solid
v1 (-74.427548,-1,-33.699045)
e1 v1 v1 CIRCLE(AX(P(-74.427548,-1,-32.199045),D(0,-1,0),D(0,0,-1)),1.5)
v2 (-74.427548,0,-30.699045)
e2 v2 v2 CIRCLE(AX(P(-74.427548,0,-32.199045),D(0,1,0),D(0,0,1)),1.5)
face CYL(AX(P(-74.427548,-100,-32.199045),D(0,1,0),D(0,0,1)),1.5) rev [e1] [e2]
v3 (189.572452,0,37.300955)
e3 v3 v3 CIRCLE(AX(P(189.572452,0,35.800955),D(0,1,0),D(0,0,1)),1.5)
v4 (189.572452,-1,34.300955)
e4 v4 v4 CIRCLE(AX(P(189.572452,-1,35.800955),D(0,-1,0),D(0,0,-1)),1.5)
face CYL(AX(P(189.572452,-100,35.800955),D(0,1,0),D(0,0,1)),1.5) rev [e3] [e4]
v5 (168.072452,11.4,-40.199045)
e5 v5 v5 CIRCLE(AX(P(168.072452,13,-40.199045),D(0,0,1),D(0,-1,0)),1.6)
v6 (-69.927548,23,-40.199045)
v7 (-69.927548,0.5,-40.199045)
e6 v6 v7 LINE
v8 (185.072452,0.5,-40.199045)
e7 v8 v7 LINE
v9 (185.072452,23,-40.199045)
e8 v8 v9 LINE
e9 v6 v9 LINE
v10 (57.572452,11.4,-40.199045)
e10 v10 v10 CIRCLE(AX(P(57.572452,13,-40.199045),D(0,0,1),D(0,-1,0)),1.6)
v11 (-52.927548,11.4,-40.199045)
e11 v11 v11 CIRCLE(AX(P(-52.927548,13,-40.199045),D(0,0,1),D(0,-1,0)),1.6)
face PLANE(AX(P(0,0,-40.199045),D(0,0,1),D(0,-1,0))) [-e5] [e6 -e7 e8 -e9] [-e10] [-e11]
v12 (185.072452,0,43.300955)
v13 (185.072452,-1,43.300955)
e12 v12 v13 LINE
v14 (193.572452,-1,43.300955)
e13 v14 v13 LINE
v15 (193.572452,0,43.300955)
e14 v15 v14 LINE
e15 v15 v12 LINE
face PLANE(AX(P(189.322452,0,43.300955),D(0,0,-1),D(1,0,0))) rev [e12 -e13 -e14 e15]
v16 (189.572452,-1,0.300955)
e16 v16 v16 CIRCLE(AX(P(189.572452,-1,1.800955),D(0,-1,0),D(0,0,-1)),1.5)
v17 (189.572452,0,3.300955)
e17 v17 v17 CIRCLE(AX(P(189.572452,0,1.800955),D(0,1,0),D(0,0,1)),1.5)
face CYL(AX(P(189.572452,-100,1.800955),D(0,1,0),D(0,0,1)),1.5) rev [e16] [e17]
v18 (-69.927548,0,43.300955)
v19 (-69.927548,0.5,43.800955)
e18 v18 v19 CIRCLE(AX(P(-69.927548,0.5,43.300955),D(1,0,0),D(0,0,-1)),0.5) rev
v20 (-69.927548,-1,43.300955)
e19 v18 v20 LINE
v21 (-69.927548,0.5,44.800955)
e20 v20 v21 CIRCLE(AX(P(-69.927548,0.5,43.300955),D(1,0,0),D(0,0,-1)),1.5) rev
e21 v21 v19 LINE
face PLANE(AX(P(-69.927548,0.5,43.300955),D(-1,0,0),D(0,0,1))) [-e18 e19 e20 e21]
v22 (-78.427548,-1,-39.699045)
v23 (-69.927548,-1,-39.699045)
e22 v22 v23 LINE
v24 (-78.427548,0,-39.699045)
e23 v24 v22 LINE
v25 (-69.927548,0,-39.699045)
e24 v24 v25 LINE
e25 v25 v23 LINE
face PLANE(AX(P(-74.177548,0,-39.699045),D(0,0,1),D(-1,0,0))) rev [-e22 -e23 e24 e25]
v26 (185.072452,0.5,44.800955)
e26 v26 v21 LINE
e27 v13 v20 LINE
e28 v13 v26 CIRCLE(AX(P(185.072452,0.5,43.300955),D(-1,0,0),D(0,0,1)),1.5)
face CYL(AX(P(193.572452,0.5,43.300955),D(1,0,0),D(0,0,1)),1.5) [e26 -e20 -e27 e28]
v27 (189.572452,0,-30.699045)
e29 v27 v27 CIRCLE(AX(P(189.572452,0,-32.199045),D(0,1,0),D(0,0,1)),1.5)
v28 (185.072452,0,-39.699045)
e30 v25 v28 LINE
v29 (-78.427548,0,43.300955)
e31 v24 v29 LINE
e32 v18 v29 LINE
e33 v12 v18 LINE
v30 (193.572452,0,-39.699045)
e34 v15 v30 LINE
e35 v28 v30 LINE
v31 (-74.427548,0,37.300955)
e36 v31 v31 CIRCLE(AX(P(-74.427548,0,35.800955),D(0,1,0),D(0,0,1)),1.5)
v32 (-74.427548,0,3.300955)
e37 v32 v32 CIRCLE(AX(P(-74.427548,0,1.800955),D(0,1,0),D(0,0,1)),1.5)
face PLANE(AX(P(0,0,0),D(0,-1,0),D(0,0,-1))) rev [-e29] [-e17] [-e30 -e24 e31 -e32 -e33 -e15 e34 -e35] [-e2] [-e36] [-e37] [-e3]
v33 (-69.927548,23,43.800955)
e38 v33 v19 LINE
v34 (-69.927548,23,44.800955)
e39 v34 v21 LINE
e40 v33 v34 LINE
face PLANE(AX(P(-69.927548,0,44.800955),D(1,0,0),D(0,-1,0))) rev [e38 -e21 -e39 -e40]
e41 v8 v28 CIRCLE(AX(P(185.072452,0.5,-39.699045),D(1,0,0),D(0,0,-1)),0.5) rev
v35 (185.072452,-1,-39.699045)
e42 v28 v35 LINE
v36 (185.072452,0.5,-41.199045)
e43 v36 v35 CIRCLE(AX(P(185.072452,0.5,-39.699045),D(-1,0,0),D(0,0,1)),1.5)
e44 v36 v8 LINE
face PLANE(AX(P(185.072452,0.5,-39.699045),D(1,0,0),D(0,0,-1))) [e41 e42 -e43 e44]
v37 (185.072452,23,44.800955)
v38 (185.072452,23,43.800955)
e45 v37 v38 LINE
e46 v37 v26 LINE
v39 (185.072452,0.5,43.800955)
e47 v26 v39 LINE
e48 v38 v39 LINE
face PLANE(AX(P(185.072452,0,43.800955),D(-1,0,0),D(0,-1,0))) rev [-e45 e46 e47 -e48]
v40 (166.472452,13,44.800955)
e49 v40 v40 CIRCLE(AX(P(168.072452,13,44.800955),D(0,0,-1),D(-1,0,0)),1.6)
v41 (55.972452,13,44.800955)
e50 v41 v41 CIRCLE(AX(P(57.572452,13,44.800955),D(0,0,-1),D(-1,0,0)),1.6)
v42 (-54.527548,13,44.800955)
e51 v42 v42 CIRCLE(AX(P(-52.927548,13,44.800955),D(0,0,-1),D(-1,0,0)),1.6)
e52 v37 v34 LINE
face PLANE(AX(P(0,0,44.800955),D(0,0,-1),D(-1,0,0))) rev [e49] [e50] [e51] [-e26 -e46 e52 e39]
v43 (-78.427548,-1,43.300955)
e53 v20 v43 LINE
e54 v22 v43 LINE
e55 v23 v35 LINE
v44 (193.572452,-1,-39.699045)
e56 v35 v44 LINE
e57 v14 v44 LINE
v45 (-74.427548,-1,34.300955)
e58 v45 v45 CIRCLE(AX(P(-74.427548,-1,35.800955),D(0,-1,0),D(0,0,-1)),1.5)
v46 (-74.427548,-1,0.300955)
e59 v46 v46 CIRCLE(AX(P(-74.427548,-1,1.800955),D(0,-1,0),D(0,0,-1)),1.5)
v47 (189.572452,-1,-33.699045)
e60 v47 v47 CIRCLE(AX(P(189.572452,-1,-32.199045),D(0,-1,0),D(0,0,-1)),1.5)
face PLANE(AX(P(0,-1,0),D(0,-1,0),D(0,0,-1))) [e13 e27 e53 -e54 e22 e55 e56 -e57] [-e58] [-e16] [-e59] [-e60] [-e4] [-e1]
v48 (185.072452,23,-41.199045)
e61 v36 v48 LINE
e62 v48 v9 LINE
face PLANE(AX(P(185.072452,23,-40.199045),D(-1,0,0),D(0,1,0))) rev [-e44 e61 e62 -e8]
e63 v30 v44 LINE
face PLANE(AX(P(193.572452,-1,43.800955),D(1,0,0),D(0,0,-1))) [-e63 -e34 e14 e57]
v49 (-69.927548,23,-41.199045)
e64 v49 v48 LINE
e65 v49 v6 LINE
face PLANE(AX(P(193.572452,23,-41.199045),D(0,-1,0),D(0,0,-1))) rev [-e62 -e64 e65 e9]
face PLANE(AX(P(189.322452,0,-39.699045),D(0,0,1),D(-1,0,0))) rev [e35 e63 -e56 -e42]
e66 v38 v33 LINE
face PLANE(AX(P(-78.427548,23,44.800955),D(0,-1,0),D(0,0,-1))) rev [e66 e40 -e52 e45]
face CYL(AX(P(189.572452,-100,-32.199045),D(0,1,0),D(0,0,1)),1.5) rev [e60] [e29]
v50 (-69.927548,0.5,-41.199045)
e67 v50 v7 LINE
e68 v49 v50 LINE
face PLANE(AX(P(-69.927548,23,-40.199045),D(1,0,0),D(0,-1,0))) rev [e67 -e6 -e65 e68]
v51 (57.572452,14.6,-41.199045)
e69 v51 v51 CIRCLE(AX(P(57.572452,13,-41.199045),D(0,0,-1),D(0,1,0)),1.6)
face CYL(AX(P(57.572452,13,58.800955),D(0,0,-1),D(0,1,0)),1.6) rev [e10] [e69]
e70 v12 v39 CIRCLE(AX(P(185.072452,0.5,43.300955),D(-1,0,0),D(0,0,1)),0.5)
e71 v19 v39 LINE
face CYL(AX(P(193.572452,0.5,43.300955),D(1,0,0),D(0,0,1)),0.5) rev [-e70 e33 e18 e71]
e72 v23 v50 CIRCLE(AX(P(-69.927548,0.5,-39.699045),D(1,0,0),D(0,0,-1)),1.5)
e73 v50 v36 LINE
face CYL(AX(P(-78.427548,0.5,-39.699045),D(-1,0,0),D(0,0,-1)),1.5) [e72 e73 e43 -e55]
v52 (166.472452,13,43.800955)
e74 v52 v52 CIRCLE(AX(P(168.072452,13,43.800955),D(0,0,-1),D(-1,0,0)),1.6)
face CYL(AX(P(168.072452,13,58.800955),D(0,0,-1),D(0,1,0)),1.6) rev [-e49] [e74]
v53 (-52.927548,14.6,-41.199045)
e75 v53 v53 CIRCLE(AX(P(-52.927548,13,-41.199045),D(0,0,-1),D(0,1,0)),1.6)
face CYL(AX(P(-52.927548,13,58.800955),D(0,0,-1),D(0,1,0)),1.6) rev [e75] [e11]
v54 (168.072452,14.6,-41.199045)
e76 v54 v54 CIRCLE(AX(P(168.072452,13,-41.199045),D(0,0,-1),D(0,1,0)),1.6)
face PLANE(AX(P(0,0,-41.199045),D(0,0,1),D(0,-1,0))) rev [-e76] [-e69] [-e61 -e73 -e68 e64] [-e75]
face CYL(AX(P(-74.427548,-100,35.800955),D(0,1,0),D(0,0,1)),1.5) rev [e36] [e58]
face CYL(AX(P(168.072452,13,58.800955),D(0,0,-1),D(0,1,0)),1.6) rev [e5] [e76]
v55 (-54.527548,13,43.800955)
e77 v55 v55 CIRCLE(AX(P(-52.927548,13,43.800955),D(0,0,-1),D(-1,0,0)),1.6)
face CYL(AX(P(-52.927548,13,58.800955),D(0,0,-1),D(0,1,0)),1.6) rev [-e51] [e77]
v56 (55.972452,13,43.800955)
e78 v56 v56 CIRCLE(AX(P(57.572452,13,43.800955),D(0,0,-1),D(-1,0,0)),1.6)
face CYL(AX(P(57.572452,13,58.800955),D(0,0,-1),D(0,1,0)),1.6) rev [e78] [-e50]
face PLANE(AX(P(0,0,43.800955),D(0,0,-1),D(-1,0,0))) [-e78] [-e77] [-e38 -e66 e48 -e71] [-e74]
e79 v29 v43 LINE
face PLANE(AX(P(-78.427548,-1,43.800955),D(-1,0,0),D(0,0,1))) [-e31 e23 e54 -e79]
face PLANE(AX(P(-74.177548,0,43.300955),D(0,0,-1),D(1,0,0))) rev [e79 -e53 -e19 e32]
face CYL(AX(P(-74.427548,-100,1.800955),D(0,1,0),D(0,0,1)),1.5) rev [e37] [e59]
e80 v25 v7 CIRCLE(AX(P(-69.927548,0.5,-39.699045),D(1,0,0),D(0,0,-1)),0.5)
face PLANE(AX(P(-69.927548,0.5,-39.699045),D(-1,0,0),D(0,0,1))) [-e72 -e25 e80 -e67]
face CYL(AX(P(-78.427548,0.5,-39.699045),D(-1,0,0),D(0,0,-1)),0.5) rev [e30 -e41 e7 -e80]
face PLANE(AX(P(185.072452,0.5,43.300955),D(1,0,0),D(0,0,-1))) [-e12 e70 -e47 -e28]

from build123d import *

# Parameters (mm, degrees)
SKETCH1_W                      = 272
SKETCH1_H                      = 84
BASE_FLANGE1_DEPTH             = 1
EDGE_FLANGE1_STRIP_W           = 5
EDGE_FLANGE1_STRIP_H           = 1
EDGE_FLANGE1_STRIP_CUT_DEPTH   = 272
EDGE_FLANGE1_STRIP_2_W         = 5
EDGE_FLANGE1_STRIP_2_H         = 1
EDGE_FLANGE1_STRIP_CUT_2_DEPTH = 272
EDGE_FLANGE1_DEPTH             = 272
EDGE_FLANGE1_BEND_DEPTH        = 272
CUT_EXTRUDE1_START             = -78.427547771
CUT_EXTRUDE1_DEPTH             = 8.5
CUT_EXTRUDE1_START_2           = 185.072452229
CUT_EXTRUDE1_2_DEPTH           = 8.5
SKETCH13_R                     = 1.6
CUT_EXTRUDE2_DEPTH             = 100
SKETCH14_R                     = 1.5
CUT_EXTRUDE3_DEPTH             = 100


# Read off the part's stored shape, not the designer's step: Cut-Extrude1
# Sheet-metal steps are written as plain solids
with BuildPart() as part:
    # Sketch1 → Base-Flange1 (new body)
    with BuildSketch(Plane(origin=(0, 0, 0), x_dir=(1, 0, 0), z_dir=(0, 1, 0))):
        with Locations((57.572452229, -1.800955414)):
            Rectangle(SKETCH1_W, SKETCH1_H)
    extrude(amount=-BASE_FLANGE1_DEPTH)

    # Edge-Flange1 strip (across the edge) → Edge-Flange1 strip cut (cut)
    with BuildSketch(Plane(origin=(-78.427547771, 0, 43.800955414), x_dir=(0, 0, -1), z_dir=(1, 0, 0))):
        with Locations((-2, -0.5)):
            Rectangle(EDGE_FLANGE1_STRIP_W, EDGE_FLANGE1_STRIP_H)
    extrude(amount=EDGE_FLANGE1_STRIP_CUT_DEPTH, mode=Mode.SUBTRACT)

    # Edge-Flange1 strip 2 (across the edge) → Edge-Flange1 strip cut 2 (cut)
    with BuildSketch(Plane(origin=(193.572452229, 0, -40.199044586), x_dir=(0, 0, 1), z_dir=(-1, 0, 0))):
        with Locations((-2, -0.5)):
            Rectangle(EDGE_FLANGE1_STRIP_2_W, EDGE_FLANGE1_STRIP_2_H)
    extrude(amount=EDGE_FLANGE1_STRIP_CUT_2_DEPTH, mode=Mode.SUBTRACT)

    # Edge-Flange1 section (across the edge) → Edge-Flange1 (add)
    with BuildSketch(Plane(origin=(-78.427547771, 0, 43.800955414), x_dir=(0, 0, -1), z_dir=(1, 0, 0))):
        with BuildLine():
            Line((-1, 0.5), (-1, 23))
            Line((-1, 23), (0, 23))
            Line((0, 23), (0, 0.5))
            ThreePointArc((0, 0.5), (0.146446609, 0.146446609), (0.5, 0))
            Line((0.5, 0), (0.5, -1))
            ThreePointArc((0.5, -1), (-0.560660172, -0.560660172), (-1, 0.5))
        make_face()
    extrude(amount=EDGE_FLANGE1_DEPTH)

    # Edge-Flange1 section 2 (across the edge) → Edge-Flange1 bend (add)
    with BuildSketch(Plane(origin=(193.572452229, 0, -40.199044586), x_dir=(0, 0, 1), z_dir=(-1, 0, 0))):
        with BuildLine():
            Line((-1, 0.5), (-1, 23))
            Line((-1, 23), (0, 23))
            Line((0, 23), (0, 0.5))
            ThreePointArc((0, 0.5), (0.146446609, 0.146446609), (0.5, 0))
            Line((0.5, 0), (0.5, -1))
            ThreePointArc((0.5, -1), (-0.560660172, -0.560660172), (-1, 0.5))
        make_face()
    extrude(amount=EDGE_FLANGE1_BEND_DEPTH)

    # Cut-Extrude1 outline → Cut-Extrude1 (cut)
    with BuildSketch(Plane.YZ.offset(CUT_EXTRUDE1_START)):
        with BuildLine():
            ThreePointArc((0.5, -40.199044586), (0.146446609, -40.052597977), (0, -39.699044586))
            Line((0, -39.699044586), (-1, -39.699044586))
            ThreePointArc((-1, -39.699044586), (-0.560660172, -40.759704758), (0.5, -41.199044586))
            Line((0.5, -41.199044586), (23, -41.199044586))
            Line((23, -41.199044586), (23, -40.199044586))
            Line((23, -40.199044586), (0.5, -40.199044586))
        make_face()
        with BuildLine():
            ThreePointArc((0.5, 44.800955414), (-0.560660172, 44.361615586), (-1, 43.300955414))
            Line((-1, 43.300955414), (0, 43.300955414))
            ThreePointArc((0, 43.300955414), (0.146446609, 43.654508805), (0.5, 43.800955414))
            Line((0.5, 43.800955414), (23, 43.800955414))
            Line((23, 43.800955414), (23, 44.800955414))
            Line((23, 44.800955414), (0.5, 44.800955414))
        make_face()
    extrude(amount=CUT_EXTRUDE1_DEPTH, mode=Mode.SUBTRACT)

    # Cut-Extrude1 2 outline → Cut-Extrude1 2 (cut)
    with BuildSketch(Plane.YZ.offset(CUT_EXTRUDE1_START_2)):
        with BuildLine():
            ThreePointArc((0.5, -40.199044586), (0.146446609, -40.052597977), (0, -39.699044586))
            Line((0, -39.699044586), (-1, -39.699044586))
            ThreePointArc((-1, -39.699044586), (-0.560660172, -40.759704758), (0.5, -41.199044586))
            Line((0.5, -41.199044586), (23, -41.199044586))
            Line((23, -41.199044586), (23, -40.199044586))
            Line((23, -40.199044586), (0.5, -40.199044586))
        make_face()
        with BuildLine():
            ThreePointArc((0.5, 44.800955414), (-0.560660172, 44.361615586), (-1, 43.300955414))
            Line((-1, 43.300955414), (0, 43.300955414))
            ThreePointArc((0, 43.300955414), (0.146446609, 43.654508805), (0.5, 43.800955414))
            Line((0.5, 43.800955414), (23, 43.800955414))
            Line((23, 43.800955414), (23, 44.800955414))
            Line((23, 44.800955414), (0.5, 44.800955414))
        make_face()
    extrude(amount=CUT_EXTRUDE1_2_DEPTH, mode=Mode.SUBTRACT)

    # Sketch13 → Cut-Extrude2 (cut)
    with BuildSketch(Plane(origin=(0, 0, -41.199044586), x_dir=(-1, 0, 0), z_dir=(0, 0, -1))):
        with Locations(Location((-168.072452229, 13, 0), (0, 0, 90))):
            Circle(SKETCH13_R)
        with Locations(Location((-57.572452229, 13, 0), (0, 0, 90))):
            Circle(SKETCH13_R)
        with Locations(Location((52.927547771, 13, 0), (0, 0, 90))):
            Circle(SKETCH13_R)
    extrude(amount=-CUT_EXTRUDE2_DEPTH, mode=Mode.SUBTRACT)

    # Sketch14 → Cut-Extrude3 (cut)
    with BuildSketch(Plane(origin=(0, 0, 0), x_dir=(1, 0, 0), z_dir=(0, 1, 0))):
        with Locations(Location((-74.427547771, -1.800955414, 0), (0, 0, 270))):
            Circle(SKETCH14_R)
        with Locations(Location((-74.427547771, 32.199044586, 0), (0, 0, 270))):
            Circle(SKETCH14_R)
        with Locations(Location((-74.427547771, -35.800955414, 0), (0, 0, 270))):
            Circle(SKETCH14_R)
        with Locations(Location((189.572452229, -35.800955414, 0), (0, 0, 270))):
            Circle(SKETCH14_R)
        with Locations(Location((189.572452229, -1.800955414, 0), (0, 0, 270))):
            Circle(SKETCH14_R)
        with Locations(Location((189.572452229, 32.199044586, 0), (0, 0, 270))):
            Circle(SKETCH14_R)
    extrude(amount=-CUT_EXTRUDE3_DEPTH, mode=Mode.SUBTRACT)


solid = part.part
